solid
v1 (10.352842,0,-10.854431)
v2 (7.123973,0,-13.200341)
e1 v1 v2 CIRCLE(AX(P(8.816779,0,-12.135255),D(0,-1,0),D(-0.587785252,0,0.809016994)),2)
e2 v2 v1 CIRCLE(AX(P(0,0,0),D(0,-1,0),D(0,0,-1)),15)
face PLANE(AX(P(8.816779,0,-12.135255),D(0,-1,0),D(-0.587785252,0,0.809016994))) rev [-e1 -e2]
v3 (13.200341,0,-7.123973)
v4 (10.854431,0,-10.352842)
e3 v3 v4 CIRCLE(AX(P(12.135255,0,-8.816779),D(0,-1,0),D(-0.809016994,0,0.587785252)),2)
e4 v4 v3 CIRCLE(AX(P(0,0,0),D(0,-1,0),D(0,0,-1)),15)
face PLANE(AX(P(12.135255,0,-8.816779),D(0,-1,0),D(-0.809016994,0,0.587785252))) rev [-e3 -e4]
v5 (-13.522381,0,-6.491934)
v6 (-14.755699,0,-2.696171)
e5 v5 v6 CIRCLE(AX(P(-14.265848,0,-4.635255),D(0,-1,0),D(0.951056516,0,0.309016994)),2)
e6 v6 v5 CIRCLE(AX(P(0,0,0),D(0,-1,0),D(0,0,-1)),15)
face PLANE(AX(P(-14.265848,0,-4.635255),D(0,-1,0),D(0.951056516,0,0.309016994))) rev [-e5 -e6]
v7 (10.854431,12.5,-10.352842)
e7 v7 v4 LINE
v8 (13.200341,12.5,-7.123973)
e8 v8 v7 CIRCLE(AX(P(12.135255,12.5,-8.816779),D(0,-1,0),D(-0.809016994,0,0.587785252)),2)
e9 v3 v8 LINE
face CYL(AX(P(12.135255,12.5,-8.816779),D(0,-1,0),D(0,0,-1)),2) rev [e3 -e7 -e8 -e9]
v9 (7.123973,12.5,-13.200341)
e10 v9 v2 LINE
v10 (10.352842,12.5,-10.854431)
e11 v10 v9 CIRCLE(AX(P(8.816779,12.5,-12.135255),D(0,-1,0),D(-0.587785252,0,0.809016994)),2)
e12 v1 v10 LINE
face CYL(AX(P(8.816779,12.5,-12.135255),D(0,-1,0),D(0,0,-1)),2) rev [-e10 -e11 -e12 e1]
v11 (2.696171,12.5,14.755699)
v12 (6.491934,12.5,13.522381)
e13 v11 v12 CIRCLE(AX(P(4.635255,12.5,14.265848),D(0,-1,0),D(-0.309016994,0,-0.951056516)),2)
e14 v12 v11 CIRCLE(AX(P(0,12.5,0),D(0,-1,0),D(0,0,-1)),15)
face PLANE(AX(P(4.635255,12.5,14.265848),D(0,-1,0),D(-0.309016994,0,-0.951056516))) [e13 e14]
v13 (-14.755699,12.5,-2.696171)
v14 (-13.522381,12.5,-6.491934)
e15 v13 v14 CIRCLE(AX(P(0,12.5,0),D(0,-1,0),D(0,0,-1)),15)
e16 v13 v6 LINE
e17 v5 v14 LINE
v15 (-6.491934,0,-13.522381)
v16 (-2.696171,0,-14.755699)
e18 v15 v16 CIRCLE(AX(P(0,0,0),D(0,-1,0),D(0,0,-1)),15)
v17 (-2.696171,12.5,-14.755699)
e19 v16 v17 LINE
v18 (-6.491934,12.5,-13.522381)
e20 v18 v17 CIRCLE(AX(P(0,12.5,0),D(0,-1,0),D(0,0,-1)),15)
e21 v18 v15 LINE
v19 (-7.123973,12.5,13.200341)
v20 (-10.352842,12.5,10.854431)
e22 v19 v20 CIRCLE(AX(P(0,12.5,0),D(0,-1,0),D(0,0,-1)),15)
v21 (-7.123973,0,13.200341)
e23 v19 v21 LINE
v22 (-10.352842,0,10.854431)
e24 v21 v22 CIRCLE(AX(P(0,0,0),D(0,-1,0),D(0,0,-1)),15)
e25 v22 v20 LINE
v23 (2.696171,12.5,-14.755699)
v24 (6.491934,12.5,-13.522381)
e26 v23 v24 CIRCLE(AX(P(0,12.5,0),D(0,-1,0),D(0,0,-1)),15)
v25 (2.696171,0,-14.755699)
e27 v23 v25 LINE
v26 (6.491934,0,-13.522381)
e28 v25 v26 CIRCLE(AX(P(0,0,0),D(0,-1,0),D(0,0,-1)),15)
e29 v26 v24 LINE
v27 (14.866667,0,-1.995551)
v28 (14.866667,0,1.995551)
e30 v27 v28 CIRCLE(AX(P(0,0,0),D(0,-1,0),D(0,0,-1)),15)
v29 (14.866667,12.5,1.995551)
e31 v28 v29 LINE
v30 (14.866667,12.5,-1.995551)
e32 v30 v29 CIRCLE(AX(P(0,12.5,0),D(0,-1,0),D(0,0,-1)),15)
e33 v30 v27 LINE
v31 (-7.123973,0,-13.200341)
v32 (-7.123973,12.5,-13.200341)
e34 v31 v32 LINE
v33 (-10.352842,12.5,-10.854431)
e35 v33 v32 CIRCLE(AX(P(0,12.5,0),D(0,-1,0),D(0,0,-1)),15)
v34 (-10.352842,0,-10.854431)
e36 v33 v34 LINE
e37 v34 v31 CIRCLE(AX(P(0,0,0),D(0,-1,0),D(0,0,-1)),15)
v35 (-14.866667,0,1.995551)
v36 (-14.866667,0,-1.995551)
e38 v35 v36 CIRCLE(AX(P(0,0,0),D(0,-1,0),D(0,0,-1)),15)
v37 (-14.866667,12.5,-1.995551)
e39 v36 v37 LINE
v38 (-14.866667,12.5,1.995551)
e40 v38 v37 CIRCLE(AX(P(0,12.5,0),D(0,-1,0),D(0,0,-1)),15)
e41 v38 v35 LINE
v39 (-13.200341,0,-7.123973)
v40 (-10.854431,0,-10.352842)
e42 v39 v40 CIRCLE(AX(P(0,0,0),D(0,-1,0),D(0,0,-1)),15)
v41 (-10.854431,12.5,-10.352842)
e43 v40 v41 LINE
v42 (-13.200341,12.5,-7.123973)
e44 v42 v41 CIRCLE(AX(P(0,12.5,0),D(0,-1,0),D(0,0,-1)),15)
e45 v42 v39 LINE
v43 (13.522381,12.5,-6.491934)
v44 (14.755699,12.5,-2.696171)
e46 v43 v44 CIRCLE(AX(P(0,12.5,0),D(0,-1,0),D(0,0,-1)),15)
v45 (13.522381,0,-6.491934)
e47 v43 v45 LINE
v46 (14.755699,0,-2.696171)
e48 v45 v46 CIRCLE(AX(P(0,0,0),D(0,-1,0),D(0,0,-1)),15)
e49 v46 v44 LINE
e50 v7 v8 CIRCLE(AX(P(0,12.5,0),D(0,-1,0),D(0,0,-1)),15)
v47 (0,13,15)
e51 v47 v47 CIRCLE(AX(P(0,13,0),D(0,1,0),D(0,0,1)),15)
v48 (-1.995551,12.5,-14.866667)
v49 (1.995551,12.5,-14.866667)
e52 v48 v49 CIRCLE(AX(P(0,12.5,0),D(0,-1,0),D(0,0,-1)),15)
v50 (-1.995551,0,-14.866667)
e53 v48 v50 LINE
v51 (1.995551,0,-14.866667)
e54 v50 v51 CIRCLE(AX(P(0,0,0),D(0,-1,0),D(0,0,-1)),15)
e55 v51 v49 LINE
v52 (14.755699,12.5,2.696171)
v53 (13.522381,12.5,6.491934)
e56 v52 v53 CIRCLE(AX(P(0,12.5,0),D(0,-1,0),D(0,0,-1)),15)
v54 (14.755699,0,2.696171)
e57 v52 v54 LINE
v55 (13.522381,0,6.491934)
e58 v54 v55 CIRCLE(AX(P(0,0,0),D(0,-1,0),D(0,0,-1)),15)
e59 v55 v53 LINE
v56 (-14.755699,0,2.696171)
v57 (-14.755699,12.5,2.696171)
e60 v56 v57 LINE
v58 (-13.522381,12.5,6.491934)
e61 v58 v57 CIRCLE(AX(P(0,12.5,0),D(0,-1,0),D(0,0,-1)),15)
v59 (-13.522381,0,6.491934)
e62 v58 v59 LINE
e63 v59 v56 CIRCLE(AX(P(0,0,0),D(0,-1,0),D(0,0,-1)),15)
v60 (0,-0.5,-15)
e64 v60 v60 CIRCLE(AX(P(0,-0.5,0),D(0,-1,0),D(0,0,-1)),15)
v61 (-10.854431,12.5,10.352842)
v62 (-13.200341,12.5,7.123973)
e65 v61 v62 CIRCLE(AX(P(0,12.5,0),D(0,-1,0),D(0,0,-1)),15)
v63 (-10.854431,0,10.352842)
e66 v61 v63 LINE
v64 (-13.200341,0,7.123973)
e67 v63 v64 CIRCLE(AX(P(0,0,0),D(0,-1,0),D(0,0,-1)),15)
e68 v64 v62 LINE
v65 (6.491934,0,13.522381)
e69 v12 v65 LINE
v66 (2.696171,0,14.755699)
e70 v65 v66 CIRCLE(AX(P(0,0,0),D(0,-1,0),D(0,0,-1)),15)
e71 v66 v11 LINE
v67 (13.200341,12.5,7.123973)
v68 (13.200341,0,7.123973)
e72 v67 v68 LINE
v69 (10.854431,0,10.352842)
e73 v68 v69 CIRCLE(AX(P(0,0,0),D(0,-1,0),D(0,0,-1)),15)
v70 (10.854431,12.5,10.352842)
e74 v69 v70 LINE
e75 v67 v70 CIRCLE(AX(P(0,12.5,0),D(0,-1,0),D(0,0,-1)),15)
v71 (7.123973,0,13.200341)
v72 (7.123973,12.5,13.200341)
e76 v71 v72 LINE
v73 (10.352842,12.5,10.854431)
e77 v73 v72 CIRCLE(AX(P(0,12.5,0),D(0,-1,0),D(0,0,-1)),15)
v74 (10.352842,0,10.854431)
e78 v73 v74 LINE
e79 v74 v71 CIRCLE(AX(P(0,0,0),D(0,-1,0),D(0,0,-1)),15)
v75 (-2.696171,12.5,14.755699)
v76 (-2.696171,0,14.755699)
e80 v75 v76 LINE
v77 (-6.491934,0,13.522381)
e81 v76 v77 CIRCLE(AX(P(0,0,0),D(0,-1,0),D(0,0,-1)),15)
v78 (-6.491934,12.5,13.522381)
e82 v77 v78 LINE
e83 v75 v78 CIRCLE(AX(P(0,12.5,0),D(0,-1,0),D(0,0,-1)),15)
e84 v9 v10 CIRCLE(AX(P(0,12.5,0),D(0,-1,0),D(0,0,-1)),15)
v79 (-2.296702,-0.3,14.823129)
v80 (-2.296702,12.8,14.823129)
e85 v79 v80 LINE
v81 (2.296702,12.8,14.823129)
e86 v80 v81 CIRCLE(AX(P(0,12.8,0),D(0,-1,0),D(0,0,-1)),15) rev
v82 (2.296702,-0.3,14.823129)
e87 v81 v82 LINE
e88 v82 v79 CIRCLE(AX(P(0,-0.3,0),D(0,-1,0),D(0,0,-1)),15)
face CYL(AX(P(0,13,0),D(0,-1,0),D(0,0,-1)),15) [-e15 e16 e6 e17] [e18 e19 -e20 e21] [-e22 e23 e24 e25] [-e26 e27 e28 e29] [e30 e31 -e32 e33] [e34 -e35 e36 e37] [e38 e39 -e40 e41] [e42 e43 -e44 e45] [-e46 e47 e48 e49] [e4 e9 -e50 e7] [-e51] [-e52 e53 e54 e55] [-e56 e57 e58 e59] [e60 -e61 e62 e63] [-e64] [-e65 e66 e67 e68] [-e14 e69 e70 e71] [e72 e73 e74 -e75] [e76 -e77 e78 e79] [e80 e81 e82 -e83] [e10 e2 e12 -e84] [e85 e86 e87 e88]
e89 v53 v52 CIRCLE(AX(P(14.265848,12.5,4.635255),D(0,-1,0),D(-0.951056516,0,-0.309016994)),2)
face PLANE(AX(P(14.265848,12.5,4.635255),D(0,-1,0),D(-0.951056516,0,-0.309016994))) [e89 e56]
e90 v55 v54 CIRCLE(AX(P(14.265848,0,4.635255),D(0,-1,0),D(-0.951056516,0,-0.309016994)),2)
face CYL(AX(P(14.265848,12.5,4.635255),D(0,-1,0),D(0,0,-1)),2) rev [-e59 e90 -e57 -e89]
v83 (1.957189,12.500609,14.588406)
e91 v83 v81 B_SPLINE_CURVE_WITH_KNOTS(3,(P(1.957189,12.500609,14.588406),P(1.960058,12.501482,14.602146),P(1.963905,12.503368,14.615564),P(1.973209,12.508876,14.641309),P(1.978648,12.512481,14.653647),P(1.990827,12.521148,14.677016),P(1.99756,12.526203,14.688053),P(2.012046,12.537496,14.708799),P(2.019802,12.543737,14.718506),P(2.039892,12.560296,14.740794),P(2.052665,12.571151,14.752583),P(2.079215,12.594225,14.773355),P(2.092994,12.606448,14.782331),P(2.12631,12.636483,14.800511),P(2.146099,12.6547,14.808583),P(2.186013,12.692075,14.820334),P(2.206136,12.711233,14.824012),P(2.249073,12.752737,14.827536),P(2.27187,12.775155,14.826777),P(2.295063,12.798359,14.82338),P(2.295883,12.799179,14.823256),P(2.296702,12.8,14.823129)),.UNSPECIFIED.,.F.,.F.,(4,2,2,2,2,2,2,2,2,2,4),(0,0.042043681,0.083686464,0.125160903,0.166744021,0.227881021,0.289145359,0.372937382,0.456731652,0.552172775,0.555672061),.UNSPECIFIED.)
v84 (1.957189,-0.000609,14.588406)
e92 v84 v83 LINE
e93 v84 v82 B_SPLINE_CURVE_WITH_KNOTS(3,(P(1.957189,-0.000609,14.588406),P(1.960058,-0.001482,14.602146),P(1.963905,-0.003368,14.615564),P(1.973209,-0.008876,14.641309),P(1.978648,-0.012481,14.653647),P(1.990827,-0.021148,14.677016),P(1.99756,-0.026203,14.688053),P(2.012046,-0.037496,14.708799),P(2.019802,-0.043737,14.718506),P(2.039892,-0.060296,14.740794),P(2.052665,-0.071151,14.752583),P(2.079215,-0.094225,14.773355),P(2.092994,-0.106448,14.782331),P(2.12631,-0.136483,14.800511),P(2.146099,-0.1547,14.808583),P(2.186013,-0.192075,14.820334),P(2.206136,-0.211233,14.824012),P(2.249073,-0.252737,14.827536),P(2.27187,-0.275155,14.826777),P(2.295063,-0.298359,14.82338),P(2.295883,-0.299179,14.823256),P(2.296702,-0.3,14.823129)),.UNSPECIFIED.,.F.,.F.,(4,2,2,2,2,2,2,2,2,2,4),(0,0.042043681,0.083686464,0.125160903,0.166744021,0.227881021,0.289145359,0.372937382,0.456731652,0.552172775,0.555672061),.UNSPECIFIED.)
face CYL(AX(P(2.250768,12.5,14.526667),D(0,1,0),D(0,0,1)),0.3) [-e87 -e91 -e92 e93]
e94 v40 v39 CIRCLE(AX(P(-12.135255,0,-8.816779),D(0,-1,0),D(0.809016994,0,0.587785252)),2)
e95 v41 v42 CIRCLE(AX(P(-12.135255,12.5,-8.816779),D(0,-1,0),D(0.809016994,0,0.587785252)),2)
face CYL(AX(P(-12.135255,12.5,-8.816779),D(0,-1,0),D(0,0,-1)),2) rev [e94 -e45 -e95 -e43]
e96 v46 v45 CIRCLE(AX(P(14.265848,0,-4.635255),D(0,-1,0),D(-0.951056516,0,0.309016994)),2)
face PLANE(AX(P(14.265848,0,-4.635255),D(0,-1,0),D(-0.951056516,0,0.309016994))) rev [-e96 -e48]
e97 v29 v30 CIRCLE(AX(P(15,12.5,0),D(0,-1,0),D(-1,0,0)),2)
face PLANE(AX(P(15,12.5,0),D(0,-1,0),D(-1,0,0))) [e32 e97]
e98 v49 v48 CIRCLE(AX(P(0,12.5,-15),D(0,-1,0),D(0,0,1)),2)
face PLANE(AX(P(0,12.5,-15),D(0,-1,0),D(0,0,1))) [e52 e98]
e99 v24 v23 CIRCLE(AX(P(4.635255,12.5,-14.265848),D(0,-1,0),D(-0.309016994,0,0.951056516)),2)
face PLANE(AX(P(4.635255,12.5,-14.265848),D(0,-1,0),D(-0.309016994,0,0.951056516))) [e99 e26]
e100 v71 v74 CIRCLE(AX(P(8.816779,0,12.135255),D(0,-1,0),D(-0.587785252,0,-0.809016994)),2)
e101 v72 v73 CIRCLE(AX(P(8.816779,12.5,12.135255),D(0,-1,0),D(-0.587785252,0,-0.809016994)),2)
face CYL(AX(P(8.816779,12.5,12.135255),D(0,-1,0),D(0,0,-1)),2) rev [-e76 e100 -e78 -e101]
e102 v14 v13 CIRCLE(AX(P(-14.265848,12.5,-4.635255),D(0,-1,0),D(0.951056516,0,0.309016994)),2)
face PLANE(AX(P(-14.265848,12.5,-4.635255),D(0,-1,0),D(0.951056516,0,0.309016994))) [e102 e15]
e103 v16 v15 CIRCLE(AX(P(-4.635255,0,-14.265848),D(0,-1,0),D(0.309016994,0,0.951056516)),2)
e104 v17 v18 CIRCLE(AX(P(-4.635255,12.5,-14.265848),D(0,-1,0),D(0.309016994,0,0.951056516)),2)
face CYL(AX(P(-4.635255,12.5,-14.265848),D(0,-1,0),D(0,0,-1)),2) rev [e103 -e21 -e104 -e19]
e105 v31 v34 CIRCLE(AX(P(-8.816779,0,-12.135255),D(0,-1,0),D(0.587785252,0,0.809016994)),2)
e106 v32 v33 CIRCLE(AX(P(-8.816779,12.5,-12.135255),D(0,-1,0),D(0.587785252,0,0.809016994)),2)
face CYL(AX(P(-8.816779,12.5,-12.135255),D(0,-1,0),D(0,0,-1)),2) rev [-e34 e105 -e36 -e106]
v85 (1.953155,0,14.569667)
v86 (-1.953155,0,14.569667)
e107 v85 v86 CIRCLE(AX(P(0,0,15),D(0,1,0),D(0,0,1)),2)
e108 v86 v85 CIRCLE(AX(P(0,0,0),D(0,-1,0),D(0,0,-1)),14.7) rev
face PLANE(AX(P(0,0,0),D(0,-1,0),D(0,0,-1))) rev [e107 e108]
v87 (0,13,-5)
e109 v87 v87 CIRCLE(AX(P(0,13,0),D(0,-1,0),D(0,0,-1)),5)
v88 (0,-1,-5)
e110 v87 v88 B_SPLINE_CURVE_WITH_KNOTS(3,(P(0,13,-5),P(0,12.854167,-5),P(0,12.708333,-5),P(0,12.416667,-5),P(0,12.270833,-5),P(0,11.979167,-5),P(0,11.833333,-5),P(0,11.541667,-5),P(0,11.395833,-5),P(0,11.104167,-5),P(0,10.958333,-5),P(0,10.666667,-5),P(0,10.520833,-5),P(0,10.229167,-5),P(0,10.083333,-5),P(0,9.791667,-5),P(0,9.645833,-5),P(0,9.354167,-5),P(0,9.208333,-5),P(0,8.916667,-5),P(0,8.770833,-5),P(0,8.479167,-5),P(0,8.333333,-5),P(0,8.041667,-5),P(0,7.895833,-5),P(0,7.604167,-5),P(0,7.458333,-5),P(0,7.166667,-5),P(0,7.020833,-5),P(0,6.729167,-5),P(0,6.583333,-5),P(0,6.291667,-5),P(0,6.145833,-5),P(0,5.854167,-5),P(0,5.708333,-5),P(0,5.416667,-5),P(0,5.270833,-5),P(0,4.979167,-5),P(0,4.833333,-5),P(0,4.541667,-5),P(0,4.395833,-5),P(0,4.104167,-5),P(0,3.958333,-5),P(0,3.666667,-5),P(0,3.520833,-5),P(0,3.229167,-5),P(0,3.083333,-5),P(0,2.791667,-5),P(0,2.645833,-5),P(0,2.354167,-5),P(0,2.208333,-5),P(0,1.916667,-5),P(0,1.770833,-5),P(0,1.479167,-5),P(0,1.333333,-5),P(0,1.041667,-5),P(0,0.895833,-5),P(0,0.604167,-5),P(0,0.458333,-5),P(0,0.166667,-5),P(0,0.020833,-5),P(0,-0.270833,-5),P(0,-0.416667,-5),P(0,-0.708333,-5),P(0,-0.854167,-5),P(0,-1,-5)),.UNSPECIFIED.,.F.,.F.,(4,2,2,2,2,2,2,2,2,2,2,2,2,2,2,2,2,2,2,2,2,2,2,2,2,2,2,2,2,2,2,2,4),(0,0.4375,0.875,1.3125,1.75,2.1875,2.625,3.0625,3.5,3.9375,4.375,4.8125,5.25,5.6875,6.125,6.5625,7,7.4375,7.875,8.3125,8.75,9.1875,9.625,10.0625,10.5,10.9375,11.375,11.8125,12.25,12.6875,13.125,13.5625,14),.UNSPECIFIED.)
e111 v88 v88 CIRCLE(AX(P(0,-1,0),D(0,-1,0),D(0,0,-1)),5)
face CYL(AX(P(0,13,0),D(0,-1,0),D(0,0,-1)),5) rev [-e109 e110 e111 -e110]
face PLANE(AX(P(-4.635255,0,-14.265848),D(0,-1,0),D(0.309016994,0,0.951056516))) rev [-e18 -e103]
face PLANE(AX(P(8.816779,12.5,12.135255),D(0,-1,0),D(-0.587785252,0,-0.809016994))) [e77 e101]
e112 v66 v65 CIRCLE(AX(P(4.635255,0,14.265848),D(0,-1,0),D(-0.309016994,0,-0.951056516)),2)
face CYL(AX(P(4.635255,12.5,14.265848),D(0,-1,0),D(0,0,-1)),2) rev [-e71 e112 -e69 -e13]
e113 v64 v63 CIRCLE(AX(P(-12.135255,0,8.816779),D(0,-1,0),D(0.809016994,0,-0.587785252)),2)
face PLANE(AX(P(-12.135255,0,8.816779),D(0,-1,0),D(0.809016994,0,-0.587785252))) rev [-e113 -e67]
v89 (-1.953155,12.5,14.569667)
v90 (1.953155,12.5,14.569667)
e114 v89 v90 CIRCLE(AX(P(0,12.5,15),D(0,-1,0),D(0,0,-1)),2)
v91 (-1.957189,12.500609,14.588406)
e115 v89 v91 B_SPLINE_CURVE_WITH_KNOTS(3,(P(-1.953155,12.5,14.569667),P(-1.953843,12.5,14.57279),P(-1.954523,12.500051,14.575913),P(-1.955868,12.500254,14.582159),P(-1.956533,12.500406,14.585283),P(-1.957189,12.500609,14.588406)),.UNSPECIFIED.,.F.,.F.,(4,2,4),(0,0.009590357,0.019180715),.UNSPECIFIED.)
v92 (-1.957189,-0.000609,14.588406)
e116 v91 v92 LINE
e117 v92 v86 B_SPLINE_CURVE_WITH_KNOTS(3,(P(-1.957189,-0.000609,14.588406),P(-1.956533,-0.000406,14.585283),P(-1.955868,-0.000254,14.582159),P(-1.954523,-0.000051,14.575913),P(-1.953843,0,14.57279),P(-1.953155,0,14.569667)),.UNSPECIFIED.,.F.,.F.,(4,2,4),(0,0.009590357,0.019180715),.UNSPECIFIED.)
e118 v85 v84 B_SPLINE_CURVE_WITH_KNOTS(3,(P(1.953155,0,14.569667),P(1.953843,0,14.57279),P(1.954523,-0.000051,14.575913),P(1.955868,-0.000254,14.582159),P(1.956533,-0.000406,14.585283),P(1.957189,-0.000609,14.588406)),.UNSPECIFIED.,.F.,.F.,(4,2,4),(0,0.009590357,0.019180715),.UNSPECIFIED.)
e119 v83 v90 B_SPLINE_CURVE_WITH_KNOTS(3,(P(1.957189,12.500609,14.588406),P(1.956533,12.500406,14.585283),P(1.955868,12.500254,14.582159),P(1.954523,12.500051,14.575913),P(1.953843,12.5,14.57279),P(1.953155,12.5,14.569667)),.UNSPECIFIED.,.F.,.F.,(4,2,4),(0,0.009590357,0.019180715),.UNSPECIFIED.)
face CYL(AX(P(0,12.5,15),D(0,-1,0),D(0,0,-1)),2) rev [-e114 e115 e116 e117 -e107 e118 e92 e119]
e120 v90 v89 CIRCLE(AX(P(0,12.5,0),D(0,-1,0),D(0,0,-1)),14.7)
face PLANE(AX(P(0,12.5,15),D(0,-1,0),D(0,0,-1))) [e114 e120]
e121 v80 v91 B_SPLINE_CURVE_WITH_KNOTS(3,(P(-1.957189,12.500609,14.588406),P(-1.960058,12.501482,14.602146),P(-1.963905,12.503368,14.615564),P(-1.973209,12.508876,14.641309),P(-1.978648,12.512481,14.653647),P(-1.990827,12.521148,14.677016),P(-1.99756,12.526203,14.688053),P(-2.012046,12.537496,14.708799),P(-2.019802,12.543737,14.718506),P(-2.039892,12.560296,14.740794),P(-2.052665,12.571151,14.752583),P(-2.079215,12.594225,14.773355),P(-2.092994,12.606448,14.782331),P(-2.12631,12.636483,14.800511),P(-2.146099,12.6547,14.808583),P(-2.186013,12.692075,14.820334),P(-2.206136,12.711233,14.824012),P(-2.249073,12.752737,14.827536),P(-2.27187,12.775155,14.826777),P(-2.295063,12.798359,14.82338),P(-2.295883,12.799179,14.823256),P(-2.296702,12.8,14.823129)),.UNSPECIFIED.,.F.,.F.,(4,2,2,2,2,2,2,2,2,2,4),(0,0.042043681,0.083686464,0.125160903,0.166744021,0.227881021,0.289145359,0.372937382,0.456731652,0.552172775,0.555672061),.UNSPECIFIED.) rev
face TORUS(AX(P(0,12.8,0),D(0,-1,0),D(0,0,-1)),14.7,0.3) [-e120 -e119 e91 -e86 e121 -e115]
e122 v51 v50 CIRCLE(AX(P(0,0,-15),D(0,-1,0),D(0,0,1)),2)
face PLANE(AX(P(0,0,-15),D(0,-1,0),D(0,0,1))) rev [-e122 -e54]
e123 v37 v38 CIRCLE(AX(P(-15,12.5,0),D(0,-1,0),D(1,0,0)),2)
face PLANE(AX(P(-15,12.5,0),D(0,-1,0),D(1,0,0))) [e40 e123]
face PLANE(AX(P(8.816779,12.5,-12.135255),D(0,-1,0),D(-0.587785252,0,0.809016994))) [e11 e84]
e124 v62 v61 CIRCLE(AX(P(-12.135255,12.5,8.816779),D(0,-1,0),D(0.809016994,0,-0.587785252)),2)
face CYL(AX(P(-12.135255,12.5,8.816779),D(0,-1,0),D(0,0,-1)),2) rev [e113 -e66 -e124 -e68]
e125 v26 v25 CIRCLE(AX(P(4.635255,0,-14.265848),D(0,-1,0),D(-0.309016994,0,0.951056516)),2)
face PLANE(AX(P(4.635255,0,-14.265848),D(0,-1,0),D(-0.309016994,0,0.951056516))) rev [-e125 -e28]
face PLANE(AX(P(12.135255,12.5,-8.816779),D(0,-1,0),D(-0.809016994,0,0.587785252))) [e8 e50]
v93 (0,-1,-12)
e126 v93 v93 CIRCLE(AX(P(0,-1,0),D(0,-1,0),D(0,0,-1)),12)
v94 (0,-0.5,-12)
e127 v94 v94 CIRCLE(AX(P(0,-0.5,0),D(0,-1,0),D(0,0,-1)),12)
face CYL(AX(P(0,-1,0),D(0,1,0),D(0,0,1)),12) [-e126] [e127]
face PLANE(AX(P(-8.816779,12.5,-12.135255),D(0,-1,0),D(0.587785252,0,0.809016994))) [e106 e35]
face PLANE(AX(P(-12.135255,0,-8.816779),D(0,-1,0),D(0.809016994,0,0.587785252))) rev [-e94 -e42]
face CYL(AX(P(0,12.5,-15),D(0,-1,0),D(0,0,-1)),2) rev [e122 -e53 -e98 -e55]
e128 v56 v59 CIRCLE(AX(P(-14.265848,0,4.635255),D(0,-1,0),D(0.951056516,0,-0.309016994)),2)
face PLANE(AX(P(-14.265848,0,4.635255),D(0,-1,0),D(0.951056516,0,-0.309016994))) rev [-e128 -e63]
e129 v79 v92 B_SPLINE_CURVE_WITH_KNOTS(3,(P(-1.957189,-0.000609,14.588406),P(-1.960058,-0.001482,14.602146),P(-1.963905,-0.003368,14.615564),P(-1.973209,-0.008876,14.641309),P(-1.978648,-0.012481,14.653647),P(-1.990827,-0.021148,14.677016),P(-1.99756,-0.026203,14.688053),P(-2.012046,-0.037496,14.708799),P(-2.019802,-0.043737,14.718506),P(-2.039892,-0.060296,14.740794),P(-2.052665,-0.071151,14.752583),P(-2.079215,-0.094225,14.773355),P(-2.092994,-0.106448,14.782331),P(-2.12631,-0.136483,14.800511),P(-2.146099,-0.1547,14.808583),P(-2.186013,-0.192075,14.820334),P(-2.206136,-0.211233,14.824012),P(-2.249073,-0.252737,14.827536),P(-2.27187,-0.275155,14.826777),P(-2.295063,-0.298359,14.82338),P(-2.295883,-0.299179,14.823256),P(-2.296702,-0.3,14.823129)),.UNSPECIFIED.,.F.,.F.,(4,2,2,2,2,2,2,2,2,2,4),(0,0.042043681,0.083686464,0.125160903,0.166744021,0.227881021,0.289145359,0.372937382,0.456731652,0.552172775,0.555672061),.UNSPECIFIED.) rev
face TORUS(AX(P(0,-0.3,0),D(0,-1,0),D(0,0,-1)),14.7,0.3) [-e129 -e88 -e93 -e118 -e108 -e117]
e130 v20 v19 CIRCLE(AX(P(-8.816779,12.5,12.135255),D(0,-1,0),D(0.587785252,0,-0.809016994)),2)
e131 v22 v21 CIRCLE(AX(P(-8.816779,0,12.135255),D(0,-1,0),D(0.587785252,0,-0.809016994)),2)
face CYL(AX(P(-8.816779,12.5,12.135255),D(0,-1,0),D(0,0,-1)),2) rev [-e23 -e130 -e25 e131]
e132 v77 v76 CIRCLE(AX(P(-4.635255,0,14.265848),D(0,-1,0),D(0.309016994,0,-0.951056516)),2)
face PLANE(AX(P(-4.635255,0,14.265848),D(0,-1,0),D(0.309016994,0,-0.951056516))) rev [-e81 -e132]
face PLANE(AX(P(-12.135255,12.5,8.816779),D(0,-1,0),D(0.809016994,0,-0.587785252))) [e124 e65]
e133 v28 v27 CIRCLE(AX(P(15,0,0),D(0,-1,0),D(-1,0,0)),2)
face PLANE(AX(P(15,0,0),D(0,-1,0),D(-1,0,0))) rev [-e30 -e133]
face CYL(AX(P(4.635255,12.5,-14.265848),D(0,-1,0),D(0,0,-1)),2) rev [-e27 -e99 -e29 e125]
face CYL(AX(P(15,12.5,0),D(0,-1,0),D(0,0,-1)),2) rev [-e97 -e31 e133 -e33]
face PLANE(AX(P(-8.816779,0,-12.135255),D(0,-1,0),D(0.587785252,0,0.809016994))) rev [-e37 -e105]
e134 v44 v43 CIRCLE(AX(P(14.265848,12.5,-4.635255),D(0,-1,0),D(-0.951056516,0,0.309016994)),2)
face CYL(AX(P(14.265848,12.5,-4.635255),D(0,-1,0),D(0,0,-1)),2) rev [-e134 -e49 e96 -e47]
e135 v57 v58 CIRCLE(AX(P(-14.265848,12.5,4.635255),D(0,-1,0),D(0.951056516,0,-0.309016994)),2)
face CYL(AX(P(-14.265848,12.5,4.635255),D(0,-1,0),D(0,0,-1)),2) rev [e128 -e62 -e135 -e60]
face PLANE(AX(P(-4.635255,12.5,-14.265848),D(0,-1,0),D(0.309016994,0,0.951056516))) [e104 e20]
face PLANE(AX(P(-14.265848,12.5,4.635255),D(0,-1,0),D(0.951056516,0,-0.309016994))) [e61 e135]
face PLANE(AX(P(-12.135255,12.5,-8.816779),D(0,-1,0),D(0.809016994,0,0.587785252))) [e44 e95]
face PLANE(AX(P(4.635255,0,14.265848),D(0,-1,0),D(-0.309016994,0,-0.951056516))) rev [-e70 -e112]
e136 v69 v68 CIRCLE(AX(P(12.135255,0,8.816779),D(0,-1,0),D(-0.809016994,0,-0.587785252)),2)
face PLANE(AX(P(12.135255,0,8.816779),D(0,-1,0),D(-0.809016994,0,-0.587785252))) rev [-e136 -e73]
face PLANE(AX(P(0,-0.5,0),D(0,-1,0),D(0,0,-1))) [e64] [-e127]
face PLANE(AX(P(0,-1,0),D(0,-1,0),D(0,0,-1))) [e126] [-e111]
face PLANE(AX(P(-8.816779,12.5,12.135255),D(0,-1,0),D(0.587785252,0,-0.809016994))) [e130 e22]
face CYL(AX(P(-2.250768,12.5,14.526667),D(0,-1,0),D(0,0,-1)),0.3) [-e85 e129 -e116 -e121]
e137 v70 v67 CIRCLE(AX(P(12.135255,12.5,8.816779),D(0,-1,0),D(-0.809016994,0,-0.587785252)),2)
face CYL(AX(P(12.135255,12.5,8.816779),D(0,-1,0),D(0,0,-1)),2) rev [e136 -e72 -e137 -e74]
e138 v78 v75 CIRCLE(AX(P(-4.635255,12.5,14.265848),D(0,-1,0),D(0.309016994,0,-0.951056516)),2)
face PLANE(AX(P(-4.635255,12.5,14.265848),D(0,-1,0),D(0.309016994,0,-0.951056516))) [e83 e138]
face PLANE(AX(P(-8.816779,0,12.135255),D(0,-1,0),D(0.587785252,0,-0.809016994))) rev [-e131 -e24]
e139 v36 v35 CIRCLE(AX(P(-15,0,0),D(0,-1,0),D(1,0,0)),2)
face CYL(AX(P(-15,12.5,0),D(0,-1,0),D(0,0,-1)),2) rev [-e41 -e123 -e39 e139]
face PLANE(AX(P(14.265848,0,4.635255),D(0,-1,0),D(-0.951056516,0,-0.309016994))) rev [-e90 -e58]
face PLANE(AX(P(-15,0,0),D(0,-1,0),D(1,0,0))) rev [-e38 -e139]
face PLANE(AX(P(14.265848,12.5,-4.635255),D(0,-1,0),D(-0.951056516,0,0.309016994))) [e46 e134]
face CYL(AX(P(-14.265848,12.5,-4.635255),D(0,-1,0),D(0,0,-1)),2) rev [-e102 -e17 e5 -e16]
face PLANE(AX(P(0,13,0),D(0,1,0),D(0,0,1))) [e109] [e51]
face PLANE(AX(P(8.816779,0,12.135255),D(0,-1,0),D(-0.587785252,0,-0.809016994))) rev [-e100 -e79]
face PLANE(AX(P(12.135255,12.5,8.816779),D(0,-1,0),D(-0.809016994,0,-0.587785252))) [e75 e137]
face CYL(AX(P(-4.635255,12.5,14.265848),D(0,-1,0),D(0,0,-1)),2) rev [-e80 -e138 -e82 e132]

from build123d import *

# Parameters (mm, degrees)
SKETCH_2_R               = 15
EXTRUDE_1_DEPTH          = 13
SKETCH_8_R               = 2
CUT_EXTRUDE_10_DEPTH     = 12.5
EXTRUDE_START            = 0.5
SKETCH_10_R              = 15
EXTRUDE_4_DEPTH          = 0.5
SKETCH_11_R              = 12
EXTRUDE_5_DEPTH          = 0.5
SKETCH_12_R              = 5
CUT_EXTRUDE_12_DEPTH     = 26.416530054
FILLET_START             = -0.3000001
FILLET_2_DEPTH           = 13.1000002
FILLET_2_2_ANGLE         = 17.614798
PATTERN_CIRCULAR_1_COUNT = 20


with BuildPart() as part:
    # 草图2 → 凸台-拉伸1 (new body)
    with BuildSketch(Plane(origin=(0, 0, 0), x_dir=(1, 0, 0), z_dir=(0, 1, 0))):
        with Locations(Location((0, 0, 0), (0, 0, 90))):
            Circle(SKETCH_2_R)
    extrude(amount=EXTRUDE_1_DEPTH)

    # 草图8 → 切除-拉伸10 (cut)
    with BuildSketch(Plane.XZ):
        with Locations((0, 15)):
            Circle(SKETCH_8_R)
    cut_extrude_10 = extrude(amount=-CUT_EXTRUDE_10_DEPTH, mode=Mode.SUBTRACT)

    # 草图10 → 凸台-拉伸4 (add)
    with BuildSketch(Plane.XZ.offset(EXTRUDE_START)):
        with Locations(Location((0, 0, 0), (0, 0, 270))):
            Circle(SKETCH_10_R)
    extrude(amount=-EXTRUDE_4_DEPTH)

    # 草图11 → 凸台-拉伸5 (add)
    with BuildSketch(Plane.XZ.offset(0.5)):
        with Locations(Location((0, 0, 0), (0, 0, 270))):
            Circle(SKETCH_11_R)
    extrude(amount=EXTRUDE_5_DEPTH)

    # 草图12 → 切除-拉伸12 (cut, through all)
    with BuildSketch(Plane.XZ.offset(1)):
        with Locations(Location((0, 0, 0), (0, 0, 270))):
            Circle(SKETCH_12_R)
    extrude(amount=-CUT_EXTRUDE_12_DEPTH, mode=Mode.SUBTRACT)

    # 圆角2: read off the stored shape, not the designer's step
    # 圆角2 outline → 圆角2 (cut)
    with BuildSketch(Plane(origin=(0, 0, 0), x_dir=(1, 0, 0), z_dir=(0, 1, 0)).offset(FILLET_START)):
        with BuildLine():
            ThreePointArc((2.296701806, -14.823129252), (2.080163818, -14.773434354), (1.957189365, -14.588405797))
            ThreePointArc((1.957189365, -14.588405797), (0, -13), (-1.957189365, -14.588405797))
            ThreePointArc((-1.957189365, -14.588405797), (-2.080163818, -14.773434354), (-2.296701806, -14.823129252))
            ThreePointArc((-2.296701806, -14.823129252), (0, -15), (2.296701806, -14.823129252))
        make_face()
    extrude(amount=FILLET_2_DEPTH, mode=Mode.SUBTRACT)

    # Fillet 2 2 outline → Fillet 2 2 (revolve)
    with BuildSketch(Plane(origin=(0, 0, 0), x_dir=(-0.1531134537578896, 0, 0.9882086167800453), z_dir=(-0.9882086167800453, 0, -0.1531134537578896))):
        with BuildLine():
            Line((13, 12.8000001), (13, 12.5))
            Line((13, 12.5), (14.7, 12.5))
            ThreePointArc((14.7, 12.5), (14.912132034, 12.587867966), (15, 12.8))
            Line((15, 12.8), (13, 12.8000001))
        make_face()
        with BuildLine():
            Line((14.7, 0), (13, 0))
            Line((13, 0), (13, -0.3000001))
            Line((13, -0.3000001), (15, -0.3))
            ThreePointArc((15, -0.3), (14.912132034, -0.087867966), (14.7, 0))
        make_face()
    revolve(axis=Axis((0, 0, 0), (0, 1, 0)), revolution_arc=FILLET_2_2_ANGLE)

    # 阵列(圆周)1: 切除-拉伸10 ×20 about axis
    pattern_circular_1_axis = Axis((0, 0, 0), (0, 1, 0))
    for i in range(1, PATTERN_CIRCULAR_1_COUNT):
        add(cut_extrude_10.rotate(pattern_circular_1_axis, i * 360 / PATTERN_CIRCULAR_1_COUNT), mode=Mode.SUBTRACT)


solid = part.part
